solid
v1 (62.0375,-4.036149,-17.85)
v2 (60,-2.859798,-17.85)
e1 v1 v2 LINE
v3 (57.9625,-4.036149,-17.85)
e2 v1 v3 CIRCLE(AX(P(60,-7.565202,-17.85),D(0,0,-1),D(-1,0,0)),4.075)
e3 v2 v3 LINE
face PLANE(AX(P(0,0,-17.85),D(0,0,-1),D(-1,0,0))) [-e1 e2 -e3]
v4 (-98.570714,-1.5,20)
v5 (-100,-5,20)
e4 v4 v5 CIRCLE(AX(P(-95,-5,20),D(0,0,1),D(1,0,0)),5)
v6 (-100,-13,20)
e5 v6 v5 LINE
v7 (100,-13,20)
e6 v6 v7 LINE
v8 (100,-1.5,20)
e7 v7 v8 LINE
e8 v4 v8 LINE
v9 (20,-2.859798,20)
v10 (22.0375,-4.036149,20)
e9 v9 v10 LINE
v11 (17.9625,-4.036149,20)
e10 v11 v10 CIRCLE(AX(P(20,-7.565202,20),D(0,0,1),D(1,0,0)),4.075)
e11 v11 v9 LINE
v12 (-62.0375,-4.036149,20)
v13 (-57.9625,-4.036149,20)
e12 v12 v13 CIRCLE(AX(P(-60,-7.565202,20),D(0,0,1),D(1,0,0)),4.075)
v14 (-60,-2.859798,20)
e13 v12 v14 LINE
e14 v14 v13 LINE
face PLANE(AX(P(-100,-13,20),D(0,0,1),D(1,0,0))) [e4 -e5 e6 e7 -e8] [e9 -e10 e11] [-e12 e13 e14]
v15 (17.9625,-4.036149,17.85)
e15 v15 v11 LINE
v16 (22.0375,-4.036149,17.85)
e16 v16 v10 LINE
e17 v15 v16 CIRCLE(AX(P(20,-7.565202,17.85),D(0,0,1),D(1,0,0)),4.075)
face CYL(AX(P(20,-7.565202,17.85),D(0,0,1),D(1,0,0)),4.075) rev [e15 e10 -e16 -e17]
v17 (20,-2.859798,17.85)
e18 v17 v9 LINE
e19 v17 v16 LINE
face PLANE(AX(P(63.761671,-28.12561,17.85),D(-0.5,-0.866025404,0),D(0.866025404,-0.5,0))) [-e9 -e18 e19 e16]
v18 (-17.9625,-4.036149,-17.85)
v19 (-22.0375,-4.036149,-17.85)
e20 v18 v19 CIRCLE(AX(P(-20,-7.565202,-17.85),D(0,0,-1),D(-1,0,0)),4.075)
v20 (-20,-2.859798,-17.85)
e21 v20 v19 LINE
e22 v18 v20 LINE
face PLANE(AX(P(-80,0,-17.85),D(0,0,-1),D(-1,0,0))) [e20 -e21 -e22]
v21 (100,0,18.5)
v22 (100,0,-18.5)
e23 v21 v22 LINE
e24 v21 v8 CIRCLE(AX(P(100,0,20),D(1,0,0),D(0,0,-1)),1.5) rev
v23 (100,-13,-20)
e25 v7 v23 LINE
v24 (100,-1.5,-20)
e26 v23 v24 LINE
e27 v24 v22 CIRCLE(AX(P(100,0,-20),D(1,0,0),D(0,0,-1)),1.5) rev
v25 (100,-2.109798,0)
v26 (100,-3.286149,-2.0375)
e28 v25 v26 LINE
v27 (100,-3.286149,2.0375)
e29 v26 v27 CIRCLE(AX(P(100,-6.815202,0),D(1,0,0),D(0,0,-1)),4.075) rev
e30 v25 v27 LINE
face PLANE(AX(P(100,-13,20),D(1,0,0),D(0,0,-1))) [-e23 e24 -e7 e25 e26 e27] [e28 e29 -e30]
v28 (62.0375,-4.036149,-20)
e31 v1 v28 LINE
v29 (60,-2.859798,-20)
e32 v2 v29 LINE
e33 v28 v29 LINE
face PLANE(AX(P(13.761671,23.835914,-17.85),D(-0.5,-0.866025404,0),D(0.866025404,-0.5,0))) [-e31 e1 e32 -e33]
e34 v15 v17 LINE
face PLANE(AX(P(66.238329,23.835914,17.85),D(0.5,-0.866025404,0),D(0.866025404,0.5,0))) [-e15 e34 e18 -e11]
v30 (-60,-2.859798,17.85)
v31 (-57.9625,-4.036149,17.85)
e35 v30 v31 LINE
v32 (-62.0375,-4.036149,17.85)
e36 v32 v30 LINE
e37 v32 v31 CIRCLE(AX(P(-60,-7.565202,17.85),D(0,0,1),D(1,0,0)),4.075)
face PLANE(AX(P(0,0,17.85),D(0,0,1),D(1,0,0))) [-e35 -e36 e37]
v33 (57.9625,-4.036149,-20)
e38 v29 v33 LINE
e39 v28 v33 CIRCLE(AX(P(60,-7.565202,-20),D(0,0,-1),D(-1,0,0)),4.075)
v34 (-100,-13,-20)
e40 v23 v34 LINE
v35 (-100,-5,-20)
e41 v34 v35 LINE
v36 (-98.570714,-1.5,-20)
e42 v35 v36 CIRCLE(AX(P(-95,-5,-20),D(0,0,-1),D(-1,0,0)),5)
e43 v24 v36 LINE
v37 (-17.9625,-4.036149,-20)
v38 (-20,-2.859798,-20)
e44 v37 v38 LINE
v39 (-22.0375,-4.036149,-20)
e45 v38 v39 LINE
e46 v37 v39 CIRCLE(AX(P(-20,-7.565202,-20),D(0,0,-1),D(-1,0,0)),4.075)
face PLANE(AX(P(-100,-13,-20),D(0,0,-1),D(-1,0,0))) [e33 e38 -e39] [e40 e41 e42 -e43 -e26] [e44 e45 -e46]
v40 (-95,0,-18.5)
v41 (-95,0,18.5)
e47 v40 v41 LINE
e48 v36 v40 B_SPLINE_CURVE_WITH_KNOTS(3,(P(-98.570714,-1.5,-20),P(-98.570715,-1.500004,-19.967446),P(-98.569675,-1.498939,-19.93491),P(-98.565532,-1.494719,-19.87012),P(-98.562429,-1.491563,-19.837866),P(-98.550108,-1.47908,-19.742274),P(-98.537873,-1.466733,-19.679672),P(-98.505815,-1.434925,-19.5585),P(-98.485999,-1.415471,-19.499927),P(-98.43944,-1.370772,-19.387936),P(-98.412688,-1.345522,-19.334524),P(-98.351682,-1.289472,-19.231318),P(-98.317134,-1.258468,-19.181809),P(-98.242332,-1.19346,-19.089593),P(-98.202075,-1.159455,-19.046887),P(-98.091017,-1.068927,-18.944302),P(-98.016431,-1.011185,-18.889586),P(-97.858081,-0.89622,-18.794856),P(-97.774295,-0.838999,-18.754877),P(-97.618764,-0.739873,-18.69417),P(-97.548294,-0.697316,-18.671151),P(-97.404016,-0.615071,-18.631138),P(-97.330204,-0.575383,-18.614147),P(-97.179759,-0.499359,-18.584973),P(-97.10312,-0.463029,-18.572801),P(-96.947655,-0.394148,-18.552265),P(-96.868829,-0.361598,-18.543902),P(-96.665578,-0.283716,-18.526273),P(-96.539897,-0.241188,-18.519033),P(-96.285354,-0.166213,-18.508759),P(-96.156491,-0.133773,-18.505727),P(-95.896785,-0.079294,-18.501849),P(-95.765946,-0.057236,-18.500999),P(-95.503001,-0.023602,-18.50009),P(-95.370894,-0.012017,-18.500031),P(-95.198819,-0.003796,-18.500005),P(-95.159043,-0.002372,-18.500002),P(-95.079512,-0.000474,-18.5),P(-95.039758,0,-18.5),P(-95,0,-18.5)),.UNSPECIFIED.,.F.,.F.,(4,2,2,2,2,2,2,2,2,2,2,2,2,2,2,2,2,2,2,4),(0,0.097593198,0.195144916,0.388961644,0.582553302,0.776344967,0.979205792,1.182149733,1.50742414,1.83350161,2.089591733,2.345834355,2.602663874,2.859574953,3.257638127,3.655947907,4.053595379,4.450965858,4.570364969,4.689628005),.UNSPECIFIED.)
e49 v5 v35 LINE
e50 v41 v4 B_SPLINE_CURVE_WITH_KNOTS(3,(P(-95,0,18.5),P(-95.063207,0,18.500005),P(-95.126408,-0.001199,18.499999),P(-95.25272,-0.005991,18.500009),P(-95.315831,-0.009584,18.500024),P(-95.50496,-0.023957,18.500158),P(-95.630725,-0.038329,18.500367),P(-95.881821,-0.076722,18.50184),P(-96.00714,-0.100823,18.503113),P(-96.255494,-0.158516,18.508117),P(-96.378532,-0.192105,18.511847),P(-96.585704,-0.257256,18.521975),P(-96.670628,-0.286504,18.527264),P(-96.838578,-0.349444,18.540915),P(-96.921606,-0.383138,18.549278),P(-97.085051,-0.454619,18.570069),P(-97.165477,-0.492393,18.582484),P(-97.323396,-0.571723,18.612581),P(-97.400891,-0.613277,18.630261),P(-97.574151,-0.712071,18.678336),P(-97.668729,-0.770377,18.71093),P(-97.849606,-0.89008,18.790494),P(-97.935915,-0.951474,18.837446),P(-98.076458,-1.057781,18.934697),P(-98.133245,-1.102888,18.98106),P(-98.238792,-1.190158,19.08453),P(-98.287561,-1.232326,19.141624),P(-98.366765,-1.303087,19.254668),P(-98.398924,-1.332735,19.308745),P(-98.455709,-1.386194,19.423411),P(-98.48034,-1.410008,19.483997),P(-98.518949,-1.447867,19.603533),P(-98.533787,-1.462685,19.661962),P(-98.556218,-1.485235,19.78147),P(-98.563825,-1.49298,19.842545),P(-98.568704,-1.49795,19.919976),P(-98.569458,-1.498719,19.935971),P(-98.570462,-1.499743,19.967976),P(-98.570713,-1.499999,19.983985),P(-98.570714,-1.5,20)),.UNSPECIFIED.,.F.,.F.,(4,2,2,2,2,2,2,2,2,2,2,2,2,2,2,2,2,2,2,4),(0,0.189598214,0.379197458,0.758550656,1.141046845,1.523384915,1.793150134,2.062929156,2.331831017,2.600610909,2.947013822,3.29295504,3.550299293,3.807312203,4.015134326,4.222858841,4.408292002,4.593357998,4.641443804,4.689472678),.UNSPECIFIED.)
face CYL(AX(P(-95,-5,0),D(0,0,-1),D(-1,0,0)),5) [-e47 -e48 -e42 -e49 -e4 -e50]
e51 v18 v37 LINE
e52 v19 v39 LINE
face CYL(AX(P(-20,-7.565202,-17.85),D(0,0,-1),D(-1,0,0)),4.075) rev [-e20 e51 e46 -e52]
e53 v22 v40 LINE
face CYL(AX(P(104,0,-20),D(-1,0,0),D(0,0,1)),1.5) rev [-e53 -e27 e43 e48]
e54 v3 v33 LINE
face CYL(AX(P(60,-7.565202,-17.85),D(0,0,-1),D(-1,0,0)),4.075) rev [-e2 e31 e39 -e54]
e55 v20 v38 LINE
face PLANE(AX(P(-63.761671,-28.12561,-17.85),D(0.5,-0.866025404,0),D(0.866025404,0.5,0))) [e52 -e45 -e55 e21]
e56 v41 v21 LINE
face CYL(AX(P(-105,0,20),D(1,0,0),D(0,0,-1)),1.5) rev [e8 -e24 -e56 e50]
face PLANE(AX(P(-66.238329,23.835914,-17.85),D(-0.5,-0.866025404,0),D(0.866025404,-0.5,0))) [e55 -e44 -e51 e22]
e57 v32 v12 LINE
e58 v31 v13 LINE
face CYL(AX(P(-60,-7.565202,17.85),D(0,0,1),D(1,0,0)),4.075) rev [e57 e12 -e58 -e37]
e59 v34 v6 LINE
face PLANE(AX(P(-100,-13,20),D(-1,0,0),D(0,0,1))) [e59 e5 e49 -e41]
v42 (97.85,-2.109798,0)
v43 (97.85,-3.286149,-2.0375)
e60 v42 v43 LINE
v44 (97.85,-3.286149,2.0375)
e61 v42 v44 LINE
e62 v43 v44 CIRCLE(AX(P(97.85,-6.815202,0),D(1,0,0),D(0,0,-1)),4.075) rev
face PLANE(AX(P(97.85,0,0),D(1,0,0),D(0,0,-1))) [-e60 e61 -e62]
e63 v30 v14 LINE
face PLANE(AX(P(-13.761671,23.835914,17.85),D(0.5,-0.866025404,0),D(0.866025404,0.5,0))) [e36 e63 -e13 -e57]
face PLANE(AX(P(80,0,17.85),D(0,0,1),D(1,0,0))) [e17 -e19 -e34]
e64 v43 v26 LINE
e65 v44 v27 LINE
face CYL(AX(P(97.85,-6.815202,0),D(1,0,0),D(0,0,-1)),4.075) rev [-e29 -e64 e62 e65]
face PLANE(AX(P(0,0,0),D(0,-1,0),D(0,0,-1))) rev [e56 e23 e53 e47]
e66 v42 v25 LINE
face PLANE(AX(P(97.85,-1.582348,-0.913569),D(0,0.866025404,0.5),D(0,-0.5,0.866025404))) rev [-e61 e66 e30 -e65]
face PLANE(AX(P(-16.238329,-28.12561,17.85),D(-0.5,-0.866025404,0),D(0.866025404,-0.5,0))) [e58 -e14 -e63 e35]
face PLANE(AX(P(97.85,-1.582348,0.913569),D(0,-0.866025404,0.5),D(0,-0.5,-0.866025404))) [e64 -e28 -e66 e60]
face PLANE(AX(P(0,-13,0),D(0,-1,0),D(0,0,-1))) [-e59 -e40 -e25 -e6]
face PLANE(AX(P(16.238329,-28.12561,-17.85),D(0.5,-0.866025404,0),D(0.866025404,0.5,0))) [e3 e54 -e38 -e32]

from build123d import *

# Parameters (mm, degrees)
SKETCH_1_W                         = 200
SKETCH_1_H                         = 40
EXTRUDE_1_DEPTH                    = 13
SWEEP_START                        = -100
SWEEP_1_DEPTH                      = 200
SWEEP_2_DEPTH                      = 200
SKETCH_16_R                        = 4.075
CUT_EXTRUDE_1_DEPTH                = 2.15
PATTERN_LINEAR_1_COUNT             = 2
PATTERN_LINEAR_1_PITCH             = 80
PATTERN_CIRCULAR_1_COUNT           = 2
PATTERN_CIRCULAR_1_COPY_1_SKETCH_R = 4.075
PATTERN_CIRCULAR_1_COPY_1_DEPTH    = 2.15
SKETCH_20_R                        = 4.075
CUT_EXTRUDE_2_DEPTH                = 2.15
FILLET_1_R                         = 5


# Read off the part's stored shape, not the designer's step: Вырез-По траектории1, Вырез-По траектории2
with BuildPart() as part:
    # Эскиз1 → Бобышка-Вытянуть1 (new body)
    with BuildSketch(Plane(origin=(0, 0, 0), x_dir=(1, 0, 0), z_dir=(0, 1, 0))):
        Rectangle(SKETCH_1_W, SKETCH_1_H)
    extrude(amount=-EXTRUDE_1_DEPTH)

    # Вырез-По траектории1 outline → Вырез-По траектории1 (cut)
    with BuildSketch(Plane.YZ.offset(SWEEP_START)):
        with BuildLine():
            Line((0, 20), (-1.5, 20))
            ThreePointArc((-1.5, 20), (-1.060660172, 18.939339828), (0, 18.5))
            Line((0, 18.5), (0, 20))
        make_face()
    extrude(amount=SWEEP_1_DEPTH, mode=Mode.SUBTRACT)

    # Вырез-По траектории2 outline → Вырез-По траектории2 (cut)
    with BuildSketch(Plane.YZ.offset(SWEEP_START)):
        with BuildLine():
            ThreePointArc((0, -18.5), (-1.060660172, -18.939339828), (-1.5, -20))
            Line((-1.5, -20), (0, -20))
            Line((0, -20), (0, -18.5))
        make_face()
    extrude(amount=SWEEP_2_DEPTH, mode=Mode.SUBTRACT)

    # Эскиз16 → Вырез-Вытянуть1 (cut)
    with BuildSketch(Plane(origin=(0, 0, -20), x_dir=(-1, 0, 0), z_dir=(0, 0, -1))):
        with Locations((-60, -7.565202347)):
            Circle(SKETCH_16_R)
        with BuildLine():
            Line((-60, -2.859797653), (-62.0375, -4.036148827))
            ThreePointArc((-62.0375, -4.036148827), (-60, -3.490202347), (-57.9625, -4.036148827))
            Line((-57.9625, -4.036148827), (-60, -2.859797653))
        make_face()
    cut_extrude_1 = extrude(amount=-CUT_EXTRUDE_1_DEPTH, mode=Mode.SUBTRACT)

    # Линейный массив1: Вырез-Вытянуть1 ×2
    with Locations(*[(-i * PATTERN_LINEAR_1_PITCH, 0, 0) for i in range(1, PATTERN_LINEAR_1_COUNT)]):
        add(cut_extrude_1, mode=Mode.SUBTRACT)

    # Круговой массив1: Вырез-Вытянуть1 ×2 about axis
    pattern_circular_1_axis = Axis((0, -13, 0), (0, -1, 0))
    for i in range(1, PATTERN_CIRCULAR_1_COUNT):
        add(cut_extrude_1.rotate(pattern_circular_1_axis, i * 360 / PATTERN_CIRCULAR_1_COUNT), mode=Mode.SUBTRACT)

    # Круговой массив1 copy 1 sketch → Круговой массив1 copy 1 (cut)
    with BuildSketch(Plane(origin=(80, 0, 20), x_dir=(1, 0, 0), z_dir=(0, 0, 1))):
        with Locations((-60, -7.565202347)):
            Circle(PATTERN_CIRCULAR_1_COPY_1_SKETCH_R)
        with BuildLine():
            Line((-60, -2.859797653), (-62.0375, -4.036148827))
            ThreePointArc((-62.0375, -4.036148827), (-60, -3.490202347), (-57.9625, -4.036148827))
            Line((-57.9625, -4.036148827), (-60, -2.859797653))
        make_face()
    extrude(amount=-PATTERN_CIRCULAR_1_COPY_1_DEPTH, mode=Mode.SUBTRACT)

    # Эскиз20 → Вырез-Вытянуть2 (cut)
    with BuildSketch(Plane.ZY.offset(-100)):
        with Locations((0, -6.815202347)):
            Circle(SKETCH_20_R)
        with BuildLine():
            Line((2.0375, -3.286148827), (0, -2.109797653))
            Line((0, -2.109797653), (-2.0375, -3.286148827))
            ThreePointArc((-2.0375, -3.286148827), (0, -2.740202347), (2.0375, -3.286148827))
        make_face()
    extrude(amount=CUT_EXTRUDE_2_DEPTH, mode=Mode.SUBTRACT)

    # Скругление1
    fillet_1_edges = [part.edges().sort_by_distance(p)[0] for p in [
        (-100, 0, 0),
    ]]
    fillet(fillet_1_edges, radius=FILLET_1_R)


solid = part.part
